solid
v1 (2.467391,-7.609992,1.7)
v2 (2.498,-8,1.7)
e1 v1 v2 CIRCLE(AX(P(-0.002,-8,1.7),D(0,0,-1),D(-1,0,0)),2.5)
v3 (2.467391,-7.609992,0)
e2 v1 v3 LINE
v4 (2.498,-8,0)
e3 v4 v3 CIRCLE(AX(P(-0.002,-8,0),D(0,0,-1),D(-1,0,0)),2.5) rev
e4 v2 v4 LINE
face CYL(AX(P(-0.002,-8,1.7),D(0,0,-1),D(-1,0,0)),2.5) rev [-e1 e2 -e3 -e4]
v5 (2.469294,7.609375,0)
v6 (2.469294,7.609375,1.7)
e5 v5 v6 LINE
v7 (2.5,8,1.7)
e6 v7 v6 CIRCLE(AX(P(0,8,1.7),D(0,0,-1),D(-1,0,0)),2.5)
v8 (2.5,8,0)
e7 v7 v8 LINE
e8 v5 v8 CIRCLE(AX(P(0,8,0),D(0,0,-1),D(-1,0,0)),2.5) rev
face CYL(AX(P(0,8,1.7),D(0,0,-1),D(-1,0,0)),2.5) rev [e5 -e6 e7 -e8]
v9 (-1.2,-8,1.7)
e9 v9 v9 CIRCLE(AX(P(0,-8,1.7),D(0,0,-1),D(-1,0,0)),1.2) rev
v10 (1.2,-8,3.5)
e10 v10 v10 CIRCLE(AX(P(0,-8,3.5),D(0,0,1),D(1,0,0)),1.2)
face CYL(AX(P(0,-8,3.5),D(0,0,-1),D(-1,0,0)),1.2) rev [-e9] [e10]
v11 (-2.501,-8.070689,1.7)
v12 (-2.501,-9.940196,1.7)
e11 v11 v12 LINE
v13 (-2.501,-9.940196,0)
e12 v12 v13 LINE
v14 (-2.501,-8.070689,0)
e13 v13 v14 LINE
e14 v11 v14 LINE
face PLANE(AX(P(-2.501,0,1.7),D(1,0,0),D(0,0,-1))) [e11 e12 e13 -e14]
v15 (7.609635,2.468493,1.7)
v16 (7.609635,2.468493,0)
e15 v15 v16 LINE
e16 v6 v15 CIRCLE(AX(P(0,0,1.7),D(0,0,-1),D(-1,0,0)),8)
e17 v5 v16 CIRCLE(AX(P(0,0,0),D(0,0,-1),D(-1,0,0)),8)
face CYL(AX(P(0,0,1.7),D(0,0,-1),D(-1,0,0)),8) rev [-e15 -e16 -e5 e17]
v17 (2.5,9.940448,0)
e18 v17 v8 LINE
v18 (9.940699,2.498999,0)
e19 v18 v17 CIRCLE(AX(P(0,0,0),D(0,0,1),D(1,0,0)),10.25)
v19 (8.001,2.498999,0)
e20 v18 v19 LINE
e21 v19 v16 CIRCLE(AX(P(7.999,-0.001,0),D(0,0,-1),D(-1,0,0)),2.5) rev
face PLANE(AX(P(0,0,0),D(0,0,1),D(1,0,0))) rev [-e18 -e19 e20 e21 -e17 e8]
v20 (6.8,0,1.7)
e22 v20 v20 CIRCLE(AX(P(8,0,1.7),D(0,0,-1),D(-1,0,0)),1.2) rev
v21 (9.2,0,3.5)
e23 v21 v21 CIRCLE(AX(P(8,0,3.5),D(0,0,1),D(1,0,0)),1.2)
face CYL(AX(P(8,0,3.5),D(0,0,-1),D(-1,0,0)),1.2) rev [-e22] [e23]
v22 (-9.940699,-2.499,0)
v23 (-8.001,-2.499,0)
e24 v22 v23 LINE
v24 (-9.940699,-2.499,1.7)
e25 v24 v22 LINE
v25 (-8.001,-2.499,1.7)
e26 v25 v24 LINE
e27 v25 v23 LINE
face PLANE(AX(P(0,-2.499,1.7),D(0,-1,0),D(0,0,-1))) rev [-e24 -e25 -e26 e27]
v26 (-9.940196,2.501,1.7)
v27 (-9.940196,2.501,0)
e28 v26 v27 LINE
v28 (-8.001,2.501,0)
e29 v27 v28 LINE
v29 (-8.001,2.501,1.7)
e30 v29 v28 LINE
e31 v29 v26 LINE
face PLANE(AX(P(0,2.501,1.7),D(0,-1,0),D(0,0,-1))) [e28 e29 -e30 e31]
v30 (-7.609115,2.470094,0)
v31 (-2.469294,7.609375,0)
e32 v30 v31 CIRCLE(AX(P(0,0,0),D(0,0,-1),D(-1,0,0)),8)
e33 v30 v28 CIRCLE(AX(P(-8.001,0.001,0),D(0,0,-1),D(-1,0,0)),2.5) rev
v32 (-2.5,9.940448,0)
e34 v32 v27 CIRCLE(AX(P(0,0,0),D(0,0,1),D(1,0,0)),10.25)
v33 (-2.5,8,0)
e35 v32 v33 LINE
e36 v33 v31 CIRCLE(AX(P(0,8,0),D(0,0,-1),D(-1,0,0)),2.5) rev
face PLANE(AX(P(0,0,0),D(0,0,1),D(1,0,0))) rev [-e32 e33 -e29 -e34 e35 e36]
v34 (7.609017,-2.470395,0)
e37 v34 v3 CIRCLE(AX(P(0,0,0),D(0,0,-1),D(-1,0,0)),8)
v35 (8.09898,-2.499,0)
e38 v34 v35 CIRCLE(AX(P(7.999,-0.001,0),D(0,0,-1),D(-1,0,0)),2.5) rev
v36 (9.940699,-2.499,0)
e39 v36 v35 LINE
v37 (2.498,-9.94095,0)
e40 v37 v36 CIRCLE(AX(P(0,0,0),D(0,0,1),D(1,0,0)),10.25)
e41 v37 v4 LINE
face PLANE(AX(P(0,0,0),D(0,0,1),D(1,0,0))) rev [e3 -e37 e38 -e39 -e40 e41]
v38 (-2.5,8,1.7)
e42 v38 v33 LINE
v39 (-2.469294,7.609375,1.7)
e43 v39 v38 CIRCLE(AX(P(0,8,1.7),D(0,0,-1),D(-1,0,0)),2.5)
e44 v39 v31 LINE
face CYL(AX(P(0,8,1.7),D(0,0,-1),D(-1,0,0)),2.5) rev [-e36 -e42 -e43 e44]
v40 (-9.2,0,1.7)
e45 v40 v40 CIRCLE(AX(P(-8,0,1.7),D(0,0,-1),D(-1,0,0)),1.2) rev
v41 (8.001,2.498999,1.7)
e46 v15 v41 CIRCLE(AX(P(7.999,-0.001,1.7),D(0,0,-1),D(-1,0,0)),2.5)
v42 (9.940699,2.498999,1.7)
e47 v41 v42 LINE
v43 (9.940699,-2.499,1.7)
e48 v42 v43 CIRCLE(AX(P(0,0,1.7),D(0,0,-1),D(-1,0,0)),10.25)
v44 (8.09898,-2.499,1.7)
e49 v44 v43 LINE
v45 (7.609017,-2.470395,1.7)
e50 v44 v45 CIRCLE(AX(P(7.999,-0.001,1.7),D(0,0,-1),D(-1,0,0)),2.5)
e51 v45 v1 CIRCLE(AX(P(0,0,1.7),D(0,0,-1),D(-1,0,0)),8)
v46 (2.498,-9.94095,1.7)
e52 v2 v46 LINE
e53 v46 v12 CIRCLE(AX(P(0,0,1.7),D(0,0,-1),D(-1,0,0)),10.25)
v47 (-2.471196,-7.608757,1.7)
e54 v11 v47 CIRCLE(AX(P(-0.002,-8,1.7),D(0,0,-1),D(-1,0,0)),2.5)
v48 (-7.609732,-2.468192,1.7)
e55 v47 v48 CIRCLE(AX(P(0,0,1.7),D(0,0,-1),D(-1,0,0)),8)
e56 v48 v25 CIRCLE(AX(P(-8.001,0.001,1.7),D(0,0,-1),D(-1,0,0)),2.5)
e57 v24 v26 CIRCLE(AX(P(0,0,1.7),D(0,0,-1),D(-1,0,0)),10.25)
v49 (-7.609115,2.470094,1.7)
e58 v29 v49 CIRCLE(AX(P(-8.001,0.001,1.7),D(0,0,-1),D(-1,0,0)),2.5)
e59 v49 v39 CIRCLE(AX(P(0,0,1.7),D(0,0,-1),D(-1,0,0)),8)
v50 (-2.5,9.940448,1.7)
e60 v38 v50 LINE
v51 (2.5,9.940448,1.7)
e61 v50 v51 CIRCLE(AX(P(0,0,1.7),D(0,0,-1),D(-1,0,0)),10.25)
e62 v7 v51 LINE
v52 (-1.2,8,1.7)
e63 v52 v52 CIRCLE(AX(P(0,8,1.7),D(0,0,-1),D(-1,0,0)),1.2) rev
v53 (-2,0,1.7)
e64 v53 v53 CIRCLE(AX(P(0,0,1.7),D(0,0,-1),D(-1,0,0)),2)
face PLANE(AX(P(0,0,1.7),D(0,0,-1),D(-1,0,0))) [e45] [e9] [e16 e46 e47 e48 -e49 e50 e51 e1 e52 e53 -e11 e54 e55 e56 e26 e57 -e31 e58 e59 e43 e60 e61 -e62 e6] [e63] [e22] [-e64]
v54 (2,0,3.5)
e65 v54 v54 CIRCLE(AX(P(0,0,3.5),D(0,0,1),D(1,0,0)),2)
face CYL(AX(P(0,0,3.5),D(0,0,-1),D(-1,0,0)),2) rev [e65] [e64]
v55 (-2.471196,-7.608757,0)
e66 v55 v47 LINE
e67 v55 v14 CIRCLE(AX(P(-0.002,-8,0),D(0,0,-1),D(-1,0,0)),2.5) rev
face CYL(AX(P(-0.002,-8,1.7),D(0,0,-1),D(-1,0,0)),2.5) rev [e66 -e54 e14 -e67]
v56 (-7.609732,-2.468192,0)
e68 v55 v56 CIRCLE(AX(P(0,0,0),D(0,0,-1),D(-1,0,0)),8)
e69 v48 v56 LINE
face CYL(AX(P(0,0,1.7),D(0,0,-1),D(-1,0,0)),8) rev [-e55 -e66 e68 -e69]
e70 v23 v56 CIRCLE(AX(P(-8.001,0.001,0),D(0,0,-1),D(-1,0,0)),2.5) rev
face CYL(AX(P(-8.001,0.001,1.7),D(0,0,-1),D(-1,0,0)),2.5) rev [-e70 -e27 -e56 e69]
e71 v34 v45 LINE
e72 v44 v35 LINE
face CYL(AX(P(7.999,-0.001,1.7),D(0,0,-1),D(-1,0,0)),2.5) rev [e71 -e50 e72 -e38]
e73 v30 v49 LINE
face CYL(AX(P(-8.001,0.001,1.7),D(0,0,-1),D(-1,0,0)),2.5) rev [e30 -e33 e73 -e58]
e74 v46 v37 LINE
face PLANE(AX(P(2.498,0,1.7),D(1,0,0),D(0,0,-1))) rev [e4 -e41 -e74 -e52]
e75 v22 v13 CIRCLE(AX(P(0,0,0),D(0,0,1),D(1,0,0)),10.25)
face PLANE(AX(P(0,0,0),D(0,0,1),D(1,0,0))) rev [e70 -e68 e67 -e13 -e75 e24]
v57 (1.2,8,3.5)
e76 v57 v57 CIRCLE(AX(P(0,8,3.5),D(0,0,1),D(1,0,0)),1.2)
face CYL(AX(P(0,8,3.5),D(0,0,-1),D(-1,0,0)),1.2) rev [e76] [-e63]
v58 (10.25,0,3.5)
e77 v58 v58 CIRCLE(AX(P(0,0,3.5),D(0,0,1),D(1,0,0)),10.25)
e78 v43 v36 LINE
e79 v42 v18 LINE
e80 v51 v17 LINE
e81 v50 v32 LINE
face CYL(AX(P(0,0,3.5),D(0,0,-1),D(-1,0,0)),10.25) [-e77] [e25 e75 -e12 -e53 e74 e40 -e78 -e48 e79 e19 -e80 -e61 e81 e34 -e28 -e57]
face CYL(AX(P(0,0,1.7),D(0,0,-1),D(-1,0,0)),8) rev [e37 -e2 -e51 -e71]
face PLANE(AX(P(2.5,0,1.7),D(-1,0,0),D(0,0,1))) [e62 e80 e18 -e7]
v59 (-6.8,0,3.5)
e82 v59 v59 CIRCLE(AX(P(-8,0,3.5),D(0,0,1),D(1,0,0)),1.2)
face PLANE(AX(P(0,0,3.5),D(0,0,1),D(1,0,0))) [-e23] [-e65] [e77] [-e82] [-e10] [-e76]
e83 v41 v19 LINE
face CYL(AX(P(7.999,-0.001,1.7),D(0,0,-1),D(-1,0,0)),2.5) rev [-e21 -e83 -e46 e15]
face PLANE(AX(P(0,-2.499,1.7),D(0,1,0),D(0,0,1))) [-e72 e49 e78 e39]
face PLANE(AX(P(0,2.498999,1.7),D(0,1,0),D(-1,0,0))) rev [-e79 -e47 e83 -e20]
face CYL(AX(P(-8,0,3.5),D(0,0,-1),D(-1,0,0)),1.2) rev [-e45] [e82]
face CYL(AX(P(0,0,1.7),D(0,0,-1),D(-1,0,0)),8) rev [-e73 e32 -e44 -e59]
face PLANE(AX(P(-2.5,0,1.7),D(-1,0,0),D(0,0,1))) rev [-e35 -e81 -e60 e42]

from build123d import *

# Parameters (mm, degrees)
SKETCH1_R              = 10.25
SKETCH1_R_2            = 2
SKETCH1_R_3            = 1.2
BOSS_EXTRUDE1_DEPTH    = 3.5
CUT_EXTRUDE2_START     = -1.7
CUT_EXTRUDE2_OUTLINE_R = 1.2
CUT_EXTRUDE2_DEPTH     = 1.7
SKETCH6_R              = 8
CUT_EXTRUDE4_DEPTH     = 1.7


# Read off the part's stored shape, not the designer's step: Cut-Extrude2
with BuildPart() as part:
    # Sketch1 → Boss-Extrude1 (new body)
    with BuildSketch(Plane.XY):
        Circle(SKETCH1_R)
        Circle(SKETCH1_R_2, mode=Mode.SUBTRACT)
        with Locations((0, 8)):
            Circle(SKETCH1_R_3, mode=Mode.SUBTRACT)
        with Locations((8, 0)):
            Circle(SKETCH1_R_3, mode=Mode.SUBTRACT)
        with Locations((0, -8)):
            Circle(SKETCH1_R_3, mode=Mode.SUBTRACT)
        with Locations((-8, 0)):
            Circle(SKETCH1_R_3, mode=Mode.SUBTRACT)
    extrude(amount=BOSS_EXTRUDE1_DEPTH)

    # Cut-Extrude2 outline → Cut-Extrude2 (cut)
    # profile 1 of 4: a face of its own
    with BuildSketch(Plane(origin=(0, 0, 0), x_dir=(-1, 0, 0), z_dir=(0, 0, -1)).offset(CUT_EXTRUDE2_START)):
        with BuildLine():
            Line((-9.94069912, -2.499), (-8.098979998, -2.499))
            ThreePointArc((-8.098979998, -2.499), (-5.49948025, -0.050000196), (-8.000999999, 2.4989992))
            Line((-8.000999999, 2.4989992), (-9.940699321, 2.4989992))
            ThreePointArc((-9.940699321, 2.4989992), (-10.25, -4.12e-07), (-9.94069912, -2.499))
        make_face()
        with Locations((-8, 0)):
            Circle(CUT_EXTRUDE2_OUTLINE_R, mode=Mode.SUBTRACT)
    # profile 2 of 4: a face of its own
    with BuildSketch(Plane(origin=(0, 0, 0), x_dir=(-1, 0, 0), z_dir=(0, 0, -1)).offset(CUT_EXTRUDE2_START)):
        with BuildLine():
            Line((-2.498, -8), (-2.498, -9.940950458))
            ThreePointArc((-2.498, -9.940950458), (0.001546691, -10.249999883), (2.501, -9.940196125))
            Line((2.501, -9.940196125), (2.5010004, -8.070689462))
            ThreePointArc((2.5010004, -8.070689462), (0.037348265, -5.500249912), (-2.498, -8))
        make_face()
        with Locations((0, -8)):
            Circle(CUT_EXTRUDE2_OUTLINE_R, mode=Mode.SUBTRACT)
    # profile 3 of 4: a face of its own
    with BuildSketch(Plane(origin=(0, 0, 0), x_dir=(-1, 0, 0), z_dir=(0, 0, -1)).offset(CUT_EXTRUDE2_START)):
        with BuildLine():
            ThreePointArc((2.5, 9.940447676), (0, 10.25), (-2.5, 9.940447676))
            Line((-2.5, 9.940447676), (-2.5, 8))
            ThreePointArc((-2.5, 8), (0, 5.5), (2.5, 8))
            Line((2.5, 8), (2.5, 9.940447676))
        make_face()
        with Locations((0, 8)):
            Circle(CUT_EXTRUDE2_OUTLINE_R, mode=Mode.SUBTRACT)
    # profile 4 of 4: a face of its own
    with BuildSketch(Plane(origin=(0, 0, 0), x_dir=(-1, 0, 0), z_dir=(0, 0, -1)).offset(CUT_EXTRUDE2_START)):
        with BuildLine():
            Line((8.001, -2.499), (9.94069912, -2.499))
            ThreePointArc((9.94069912, -2.499), (10.249999948, 0.001031141), (9.940196125, 2.501))
            Line((9.940196125, 2.501), (8.001, 2.501))
            ThreePointArc((8.001, 2.501), (5.501, 0.001), (8.001, -2.499))
        make_face()
        with Locations((8, 0)):
            Circle(CUT_EXTRUDE2_OUTLINE_R, mode=Mode.SUBTRACT)
    extrude(amount=CUT_EXTRUDE2_DEPTH, mode=Mode.SUBTRACT)

    # Sketch6 → Cut-Extrude4 (cut)
    with BuildSketch(Plane(origin=(0, 0, 0), x_dir=(-1, 0, 0), z_dir=(0, 0, -1))):
        Circle(SKETCH6_R)
    extrude(amount=-CUT_EXTRUDE4_DEPTH, mode=Mode.SUBTRACT)


solid = part.part
